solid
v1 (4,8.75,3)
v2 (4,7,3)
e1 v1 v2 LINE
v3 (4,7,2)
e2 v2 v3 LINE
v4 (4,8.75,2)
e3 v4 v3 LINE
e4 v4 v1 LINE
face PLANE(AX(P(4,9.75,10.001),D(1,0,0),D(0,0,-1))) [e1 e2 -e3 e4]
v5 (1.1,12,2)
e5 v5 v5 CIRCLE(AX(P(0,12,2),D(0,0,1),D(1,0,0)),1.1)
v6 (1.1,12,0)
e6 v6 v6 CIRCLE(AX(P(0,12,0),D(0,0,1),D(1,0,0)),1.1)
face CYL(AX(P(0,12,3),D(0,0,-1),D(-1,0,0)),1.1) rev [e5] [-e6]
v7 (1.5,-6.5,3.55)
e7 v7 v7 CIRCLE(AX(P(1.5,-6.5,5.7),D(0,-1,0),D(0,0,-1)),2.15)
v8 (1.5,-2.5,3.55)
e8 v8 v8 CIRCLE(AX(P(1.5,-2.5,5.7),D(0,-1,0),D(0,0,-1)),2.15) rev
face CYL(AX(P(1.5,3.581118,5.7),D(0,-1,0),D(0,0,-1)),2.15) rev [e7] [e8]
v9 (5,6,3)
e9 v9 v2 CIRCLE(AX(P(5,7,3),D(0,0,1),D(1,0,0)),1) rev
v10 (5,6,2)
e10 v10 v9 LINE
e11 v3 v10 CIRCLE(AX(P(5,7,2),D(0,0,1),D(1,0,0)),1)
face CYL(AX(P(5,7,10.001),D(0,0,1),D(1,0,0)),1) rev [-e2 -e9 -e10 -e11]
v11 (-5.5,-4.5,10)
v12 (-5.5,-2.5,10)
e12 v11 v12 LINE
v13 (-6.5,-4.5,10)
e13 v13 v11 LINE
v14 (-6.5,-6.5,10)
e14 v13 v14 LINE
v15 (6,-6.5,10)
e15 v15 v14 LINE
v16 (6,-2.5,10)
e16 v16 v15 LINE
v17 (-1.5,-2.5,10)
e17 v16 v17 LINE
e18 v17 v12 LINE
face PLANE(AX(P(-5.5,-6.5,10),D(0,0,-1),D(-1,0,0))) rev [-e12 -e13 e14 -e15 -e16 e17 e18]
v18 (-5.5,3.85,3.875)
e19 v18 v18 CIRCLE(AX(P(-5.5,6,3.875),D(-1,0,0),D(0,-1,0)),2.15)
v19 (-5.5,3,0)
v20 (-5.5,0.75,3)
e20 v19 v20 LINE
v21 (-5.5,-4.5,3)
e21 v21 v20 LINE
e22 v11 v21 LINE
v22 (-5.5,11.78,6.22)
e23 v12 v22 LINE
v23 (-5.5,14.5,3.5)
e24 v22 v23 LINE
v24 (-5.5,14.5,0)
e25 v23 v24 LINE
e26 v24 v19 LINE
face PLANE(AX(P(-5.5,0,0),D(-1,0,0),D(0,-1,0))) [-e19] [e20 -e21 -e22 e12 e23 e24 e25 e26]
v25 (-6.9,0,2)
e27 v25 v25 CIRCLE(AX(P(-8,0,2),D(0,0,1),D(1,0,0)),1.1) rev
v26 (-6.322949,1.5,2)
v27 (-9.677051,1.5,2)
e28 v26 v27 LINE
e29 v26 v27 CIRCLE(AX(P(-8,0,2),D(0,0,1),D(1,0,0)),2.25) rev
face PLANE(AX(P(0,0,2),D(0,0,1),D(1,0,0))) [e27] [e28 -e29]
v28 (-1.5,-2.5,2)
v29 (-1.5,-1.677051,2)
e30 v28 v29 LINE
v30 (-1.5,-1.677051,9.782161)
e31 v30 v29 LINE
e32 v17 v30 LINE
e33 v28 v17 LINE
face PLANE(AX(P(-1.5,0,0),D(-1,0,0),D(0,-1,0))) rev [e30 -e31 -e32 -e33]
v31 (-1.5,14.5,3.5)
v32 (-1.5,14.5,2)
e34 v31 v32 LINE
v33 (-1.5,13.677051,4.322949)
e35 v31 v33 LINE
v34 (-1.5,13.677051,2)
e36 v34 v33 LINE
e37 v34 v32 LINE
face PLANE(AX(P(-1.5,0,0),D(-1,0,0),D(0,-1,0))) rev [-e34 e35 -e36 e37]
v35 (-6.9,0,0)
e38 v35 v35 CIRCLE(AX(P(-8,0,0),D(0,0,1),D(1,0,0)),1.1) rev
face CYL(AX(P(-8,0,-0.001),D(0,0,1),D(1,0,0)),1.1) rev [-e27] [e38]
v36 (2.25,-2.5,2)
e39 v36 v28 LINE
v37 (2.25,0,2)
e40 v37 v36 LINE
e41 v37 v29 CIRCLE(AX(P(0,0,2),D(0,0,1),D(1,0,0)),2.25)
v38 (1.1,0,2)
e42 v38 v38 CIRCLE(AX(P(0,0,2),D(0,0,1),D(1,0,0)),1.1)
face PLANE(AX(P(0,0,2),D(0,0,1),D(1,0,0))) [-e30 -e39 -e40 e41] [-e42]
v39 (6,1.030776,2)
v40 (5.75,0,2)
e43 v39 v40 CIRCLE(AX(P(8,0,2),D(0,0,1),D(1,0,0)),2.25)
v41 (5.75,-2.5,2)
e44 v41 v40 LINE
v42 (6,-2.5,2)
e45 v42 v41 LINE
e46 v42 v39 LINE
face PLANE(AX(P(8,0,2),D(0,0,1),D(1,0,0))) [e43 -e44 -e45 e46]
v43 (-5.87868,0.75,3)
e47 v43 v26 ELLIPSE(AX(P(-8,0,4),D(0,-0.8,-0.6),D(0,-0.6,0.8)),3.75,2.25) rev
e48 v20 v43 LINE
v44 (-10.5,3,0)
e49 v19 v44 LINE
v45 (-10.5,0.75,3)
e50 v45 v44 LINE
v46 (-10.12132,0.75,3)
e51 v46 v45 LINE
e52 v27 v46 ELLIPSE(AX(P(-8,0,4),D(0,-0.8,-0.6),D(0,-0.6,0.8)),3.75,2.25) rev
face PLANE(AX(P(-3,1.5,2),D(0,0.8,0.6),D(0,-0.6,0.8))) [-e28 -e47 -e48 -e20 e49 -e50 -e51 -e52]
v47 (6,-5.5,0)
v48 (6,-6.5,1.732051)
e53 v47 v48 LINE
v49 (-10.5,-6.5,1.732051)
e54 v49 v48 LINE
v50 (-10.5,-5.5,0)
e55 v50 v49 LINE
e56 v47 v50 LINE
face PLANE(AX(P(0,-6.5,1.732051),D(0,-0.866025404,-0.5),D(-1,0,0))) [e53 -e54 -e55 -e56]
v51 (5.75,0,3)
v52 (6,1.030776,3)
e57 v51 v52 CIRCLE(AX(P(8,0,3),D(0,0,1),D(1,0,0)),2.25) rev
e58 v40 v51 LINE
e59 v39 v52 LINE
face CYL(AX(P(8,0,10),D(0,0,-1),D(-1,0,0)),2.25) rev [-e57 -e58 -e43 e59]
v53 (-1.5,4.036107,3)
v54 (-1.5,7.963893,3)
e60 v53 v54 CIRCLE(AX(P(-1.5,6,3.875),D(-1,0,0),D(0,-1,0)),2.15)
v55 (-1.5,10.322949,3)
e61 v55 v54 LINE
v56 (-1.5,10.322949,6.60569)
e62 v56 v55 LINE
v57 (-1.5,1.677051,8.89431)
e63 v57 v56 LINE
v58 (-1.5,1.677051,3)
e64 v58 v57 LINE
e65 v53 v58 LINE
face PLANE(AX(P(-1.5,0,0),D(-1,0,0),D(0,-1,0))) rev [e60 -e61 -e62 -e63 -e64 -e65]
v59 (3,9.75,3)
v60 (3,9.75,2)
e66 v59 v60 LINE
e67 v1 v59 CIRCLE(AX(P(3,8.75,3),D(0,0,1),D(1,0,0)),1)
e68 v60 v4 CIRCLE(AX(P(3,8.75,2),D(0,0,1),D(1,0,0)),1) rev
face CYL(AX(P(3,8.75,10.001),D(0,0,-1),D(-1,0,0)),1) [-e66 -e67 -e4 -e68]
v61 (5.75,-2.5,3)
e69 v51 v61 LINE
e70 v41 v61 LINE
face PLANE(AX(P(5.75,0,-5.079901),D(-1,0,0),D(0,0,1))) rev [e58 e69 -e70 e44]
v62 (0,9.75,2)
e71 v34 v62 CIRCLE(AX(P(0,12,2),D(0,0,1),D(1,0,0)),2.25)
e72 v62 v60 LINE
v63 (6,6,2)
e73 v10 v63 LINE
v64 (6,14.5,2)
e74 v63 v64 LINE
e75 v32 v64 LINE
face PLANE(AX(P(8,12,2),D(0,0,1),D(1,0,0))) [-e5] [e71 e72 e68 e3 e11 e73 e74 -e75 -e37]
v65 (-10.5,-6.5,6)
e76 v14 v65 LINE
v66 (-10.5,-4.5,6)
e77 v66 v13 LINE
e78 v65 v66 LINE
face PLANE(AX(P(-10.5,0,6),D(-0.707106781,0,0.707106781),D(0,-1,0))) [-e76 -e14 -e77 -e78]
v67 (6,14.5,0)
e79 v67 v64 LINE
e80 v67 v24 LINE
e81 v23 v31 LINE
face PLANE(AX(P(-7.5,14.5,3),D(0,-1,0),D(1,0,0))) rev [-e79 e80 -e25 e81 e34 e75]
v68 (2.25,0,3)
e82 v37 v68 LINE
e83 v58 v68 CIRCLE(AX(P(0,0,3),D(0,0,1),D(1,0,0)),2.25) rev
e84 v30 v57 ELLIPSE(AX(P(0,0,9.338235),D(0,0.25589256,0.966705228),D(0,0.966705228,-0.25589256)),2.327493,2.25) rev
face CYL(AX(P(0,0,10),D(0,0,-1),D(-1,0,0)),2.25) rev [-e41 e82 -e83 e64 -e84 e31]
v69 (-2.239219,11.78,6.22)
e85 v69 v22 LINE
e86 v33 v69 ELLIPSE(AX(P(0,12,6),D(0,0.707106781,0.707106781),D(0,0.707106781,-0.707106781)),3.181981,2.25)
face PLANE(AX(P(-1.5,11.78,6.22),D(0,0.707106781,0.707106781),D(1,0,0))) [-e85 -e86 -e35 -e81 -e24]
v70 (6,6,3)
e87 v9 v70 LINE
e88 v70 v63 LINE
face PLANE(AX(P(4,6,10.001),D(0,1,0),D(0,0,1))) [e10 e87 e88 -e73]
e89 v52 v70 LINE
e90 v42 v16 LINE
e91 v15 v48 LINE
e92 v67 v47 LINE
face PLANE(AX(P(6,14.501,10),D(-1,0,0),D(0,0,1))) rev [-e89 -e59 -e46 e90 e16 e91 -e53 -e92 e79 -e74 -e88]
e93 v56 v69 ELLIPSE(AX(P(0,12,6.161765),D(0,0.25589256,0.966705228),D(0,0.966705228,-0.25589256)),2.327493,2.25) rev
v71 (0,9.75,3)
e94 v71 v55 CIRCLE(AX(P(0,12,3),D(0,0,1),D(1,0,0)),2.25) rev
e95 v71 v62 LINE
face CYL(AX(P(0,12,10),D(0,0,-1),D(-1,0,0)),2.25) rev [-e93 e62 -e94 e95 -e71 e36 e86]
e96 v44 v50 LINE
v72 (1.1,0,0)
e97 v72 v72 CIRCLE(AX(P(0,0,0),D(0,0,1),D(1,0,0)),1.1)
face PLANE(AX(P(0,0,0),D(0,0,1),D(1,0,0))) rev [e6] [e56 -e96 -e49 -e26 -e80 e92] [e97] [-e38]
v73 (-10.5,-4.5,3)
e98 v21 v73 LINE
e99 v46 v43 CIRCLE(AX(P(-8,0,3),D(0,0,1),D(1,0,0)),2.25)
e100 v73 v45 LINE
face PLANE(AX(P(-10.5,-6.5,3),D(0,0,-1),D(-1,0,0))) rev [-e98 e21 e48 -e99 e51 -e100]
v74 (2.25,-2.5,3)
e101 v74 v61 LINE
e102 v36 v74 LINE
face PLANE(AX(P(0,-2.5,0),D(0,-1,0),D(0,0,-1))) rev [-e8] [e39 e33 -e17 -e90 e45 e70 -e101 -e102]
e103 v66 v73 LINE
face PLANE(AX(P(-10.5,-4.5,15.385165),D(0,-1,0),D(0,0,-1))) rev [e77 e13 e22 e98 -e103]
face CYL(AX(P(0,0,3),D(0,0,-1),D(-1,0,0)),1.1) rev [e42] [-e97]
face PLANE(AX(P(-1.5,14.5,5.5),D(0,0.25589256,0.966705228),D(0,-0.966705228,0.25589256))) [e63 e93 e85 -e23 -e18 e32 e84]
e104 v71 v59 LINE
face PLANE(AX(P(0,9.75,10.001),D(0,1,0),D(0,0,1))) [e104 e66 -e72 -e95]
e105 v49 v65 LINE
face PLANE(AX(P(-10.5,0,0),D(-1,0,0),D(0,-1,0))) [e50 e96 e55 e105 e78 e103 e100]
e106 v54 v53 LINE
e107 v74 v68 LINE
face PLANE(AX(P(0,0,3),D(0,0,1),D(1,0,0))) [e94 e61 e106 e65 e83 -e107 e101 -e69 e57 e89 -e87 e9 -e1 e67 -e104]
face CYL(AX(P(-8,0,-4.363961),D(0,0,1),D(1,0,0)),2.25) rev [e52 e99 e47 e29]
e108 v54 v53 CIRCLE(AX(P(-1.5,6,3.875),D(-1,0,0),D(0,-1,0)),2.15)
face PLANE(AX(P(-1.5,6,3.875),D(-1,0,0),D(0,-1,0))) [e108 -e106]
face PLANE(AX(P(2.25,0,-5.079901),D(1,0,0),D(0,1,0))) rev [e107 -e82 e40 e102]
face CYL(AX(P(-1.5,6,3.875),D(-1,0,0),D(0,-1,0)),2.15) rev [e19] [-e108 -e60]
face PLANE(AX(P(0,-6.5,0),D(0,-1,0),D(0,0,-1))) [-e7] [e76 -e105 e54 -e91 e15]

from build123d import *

# Parameters (mm, degrees)
SKETCH_1_W               = 23
SKETCH_1_H               = 17
SKETCH_1_R               = 1.1
EXTRUDE_1_DEPTH          = 3
EXTRUDE_2_DEPTH          = 6
CUT_EXTRUDE_1_DEPTH      = 23.349496639
CUT_EXTRUDE_1_DEPTH_BACK = 1
SKETCH_3_R               = 2.25
CUT_EXTRUDE_2_REACH      = 24.349
SKETCH_4_W               = 4.5
SKETCH_4_H               = 17
CUT_EXTRUDE_3_DEPTH      = 2
SKETCH_6_R               = 2.15
CUT_EXTRUDE_4_DEPTH      = 4
SKETCH_7_W               = 16.5
SKETCH_7_H               = 10
EXTRUDE_3_DEPTH          = 4
SKETCH_8_R               = 2.15
CUT_EXTRUDE_5_DEPTH      = 4
CHAMFER_1_SIZE           = 1
CHAMFER_1_SIZE2          = 1.732050808
CHAMFER_2_SIZE           = 4
CUT_EXTRUDE_6_DEPTH      = 1
FILLET_1_R               = 2
CUT_EXTRUDE_7_REACH      = 21.881
FILLET_2_R               = 1
CHAMFER_3_SIZE           = 2
CHAMFER_3_SIZE2          = 2.813680863
CUT_EXTRUDE_8_REACH      = 27.729
SKETCH_11_W              = 5
SKETCH_11_H              = 10
EXTRUDE_4_DEPTH          = 5
CUT_EXTRUDE_9_REACH      = 21.222
SKETCH_13_R              = 1.1
SKETCH_14_R              = 2.25
CUT_EXTRUDE_10_DEPTH     = 1
EXTRUDE_6_REACH          = 26.135
FILLET_3_R               = 2
SKETCH_15_W              = 5
SKETCH_15_H              = 2
EXTRUDE_5_DEPTH          = 7
CUT_EXTRUDE_11_DEPTH     = 5
CHAMFER_4_SIZE           = 4


with BuildPart() as part:
    # 草图1 → 凸台-拉伸1 (new body)
    with BuildSketch(Plane.XY):
        with Locations((4, 6)):
            Rectangle(SKETCH_1_W, SKETCH_1_H)
        Circle(SKETCH_1_R, mode=Mode.SUBTRACT)
        with Locations((8, 0)):
            Circle(SKETCH_1_R, mode=Mode.SUBTRACT)
        with Locations((0, 12)):
            Circle(SKETCH_1_R, mode=Mode.SUBTRACT)
        with Locations((8, 12)):
            Circle(SKETCH_1_R, mode=Mode.SUBTRACT)
    extrude(amount=EXTRUDE_1_DEPTH)

    # 草图2 → 凸台-拉伸2 (add)
    with BuildSketch(Plane.ZY.offset(7.5)):
        Polygon((5.5, 14.5), (10, -2.5), (5.5, -2.5), (0, -2.5), (0, 14.5), align=None)
    extrude(amount=-EXTRUDE_2_DEPTH)

    # 草图3 → 切除-拉伸1 (cut, two sides: drawn at the far end of the back side and taken through both)
    with BuildSketch(Plane.XY.offset(3).offset(-CUT_EXTRUDE_1_DEPTH_BACK)):
        with Locations(Location((0, 12, 0), (0, 0, 228.189685104))):
            Circle(SKETCH_3_R)
        with Locations((8, 12)):
            Circle(SKETCH_3_R)
        with Locations(Location((0, 0, 0), (0, 0, 131.810314896))):
            Circle(SKETCH_3_R)
        with Locations((8, 0)):
            Circle(SKETCH_3_R)
    extrude(amount=CUT_EXTRUDE_1_DEPTH + CUT_EXTRUDE_1_DEPTH_BACK, mode=Mode.SUBTRACT)

    # 草图4 → 切除-拉伸2 (cut, up to next)
    with BuildSketch(Plane.XY.offset(3), mode=Mode.PRIVATE) as cut_extrude_2_sk1:
        with Locations((13.25, 6)):
            Rectangle(SKETCH_4_W, SKETCH_4_H)
    cut_extrude_2_tool1 = extrude(cut_extrude_2_sk1.sketch, amount=-CUT_EXTRUDE_2_REACH, mode=Mode.PRIVATE) & part.part
    add(cut_extrude_2_tool1.solids().sort_by_distance((13.25, 6, 3))[0], mode=Mode.SUBTRACT)

    # 草图5 → 切除-拉伸3 (cut)
    with BuildSketch(Plane.ZY.offset(7.5)):
        Polygon((0, 14.5), (0, -2.5), (10, -2.5), (5.5, 14.5), align=None)
    extrude(amount=-CUT_EXTRUDE_3_DEPTH, mode=Mode.SUBTRACT)

    # 草图6 → 切除-拉伸4 (cut)
    with BuildSketch(Plane.ZY.offset(5.5)):
        with Locations(Location((3.875, 6, 0), (0, 0, 270))):
            Circle(SKETCH_6_R)
    extrude(amount=-CUT_EXTRUDE_4_DEPTH, mode=Mode.SUBTRACT)

    # 草图7 → 凸台-拉伸3 (add)
    with BuildSketch(Plane.XZ.offset(2.5)):
        with Locations((2.75, 5)):
            Rectangle(SKETCH_7_W, SKETCH_7_H)
    extrude(amount=EXTRUDE_3_DEPTH)

    # 草图8 → 切除-拉伸5 (cut)
    with BuildSketch(Plane.XZ.offset(6.5)):
        with Locations(Location((1.5, 5.7, 0), (0, 0, 270))):
            Circle(SKETCH_8_R)
    extrude(amount=-CUT_EXTRUDE_5_DEPTH, mode=Mode.SUBTRACT)

    # 倒角1
    chamfer_1_edges = [part.edges().sort_by_distance(p)[0] for p in [
        (2.75, -6.5, 0),
    ]]
    chamfer_1_side = [part.faces().sort_by_distance(p)[0] for p in [
        (2.692629218, 3.908206749, 0),
    ]]
    chamfer(chamfer_1_edges, length=CHAMFER_1_SIZE, length2=CHAMFER_1_SIZE2, reference=chamfer_1_side[0])

    # 倒角2
    chamfer_2_edges = [part.edges().sort_by_distance(p)[0] for p in [
        (11, -4.5, 10),
    ]]
    chamfer(chamfer_2_edges, length=CHAMFER_2_SIZE)

    # 草图9 → 切除-拉伸6 (cut)
    with BuildSketch(Plane.XY.offset(3)):
        with BuildLine():
            Line((-1.5, 13.677050983), (-1.5, 14.5))
            Line((-1.5, 14.5), (2.25, 14.5))
            Line((2.25, 14.5), (2.25, 12))
            ThreePointArc((2.25, 12), (0.918558654, 14.053959591), (-1.5, 13.677050983))
        make_face()
        with BuildLine():
            Line((5.75, 12), (5.75, 14.5))
            Line((5.75, 14.5), (11, 14.5))
            Line((11, 14.5), (11, 9.75))
            Line((11, 9.75), (8, 9.75))
            ThreePointArc((8, 9.75), (9.590990258, 13.590990258), (5.75, 12))
        make_face()
        with BuildLine():
            Line((2.25, 0), (2.25, -2.5))
            Line((2.25, -2.5), (-1.5, -2.5))
            Line((-1.5, -2.5), (-1.5, -1.677050983))
            ThreePointArc((-1.5, -1.677050983), (0.918558654, -2.053959591), (2.25, 0))
        make_face()
        with BuildLine():
            Line((5.75, 0), (5.75, -2.5))
            Line((5.75, -2.5), (11, -2.5))
            Line((11, -2.5), (11, 2.25))
            Line((11, 2.25), (8, 2.25))
            ThreePointArc((8, 2.25), (9.590990258, -1.590990258), (5.75, 0))
        make_face()
    extrude(amount=-CUT_EXTRUDE_6_DEPTH, mode=Mode.SUBTRACT)

    # 圆角1
    fillet_1_edges = [part.edges().sort_by_distance(p)[0] for p in [
        (11, 14.5, 1),
    ]]
    fillet(fillet_1_edges, radius=FILLET_1_R)

    # 草图10 → 切除-拉伸7 (cut, up to next)
    with BuildSketch(Plane.XY.offset(2), mode=Mode.PRIVATE) as cut_extrude_7_sk1:
        with BuildLine():
            Line((4, 14.5), (11, 14.5))
            Line((11, 14.5), (11, 6))
            Line((11, 6), (4, 6))
            Line((4, 6), (4, 9.75))
            Line((4, 9.75), (0, 9.75))
            ThreePointArc((0, 9.75), (1.590990258, 10.409009742), (2.25, 12))
            Line((2.25, 12), (2.25, 14.5))
            Line((2.25, 14.5), (4, 14.5))
        make_face()
    cut_extrude_7_tool1 = extrude(cut_extrude_7_sk1.sketch, amount=CUT_EXTRUDE_7_REACH, mode=Mode.PRIVATE) & part.part
    add(cut_extrude_7_tool1.solids().sort_by_distance((6.881457, 10.476255, 2))[0], mode=Mode.SUBTRACT)

    # 圆角2
    fillet_2_edges = [part.edges().sort_by_distance(p)[0] for p in [
        (4, 9.75, 2.5),
        (4, 6, 2.5),
    ]]
    fillet(fillet_2_edges, radius=FILLET_2_R)

    # 倒角3
    chamfer_3_edges = [part.edges().sort_by_distance(p)[0] for p in [
        (-3.5, 14.5, 5.5),
    ]]
    chamfer_3_side = [part.faces().sort_by_distance(p)[0] for p in [
        (0.040697674, 14.5, 1.895348837),
    ]]
    chamfer(chamfer_3_edges, length=CHAMFER_3_SIZE, length2=CHAMFER_3_SIZE2, reference=chamfer_3_side[0])

    # 草图11 → 切除-拉伸8 (cut, up to next)
    with BuildSketch(Plane.XZ.offset(6.5), mode=Mode.PRIVATE) as cut_extrude_8_sk1:
        with Locations((8.5, 5)):
            Rectangle(SKETCH_11_W, SKETCH_11_H)
    cut_extrude_8_tool1 = extrude(cut_extrude_8_sk1.sketch, amount=-CUT_EXTRUDE_8_REACH, mode=Mode.PRIVATE) & part.part
    add(cut_extrude_8_tool1.solids().sort_by_distance((8.5, -6.5, 5))[0], mode=Mode.SUBTRACT)

    # 草图12 → 凸台-拉伸4 (add)
    with BuildSketch(Plane.ZY.offset(5.5)):
        Polygon((0, -5.5), (1.732050808, -6.5), (3, -6.5), (3, 1.5), (0, 1.5), align=None)
    extrude(amount=EXTRUDE_4_DEPTH)

    # 草图13 → 切除-拉伸9 (cut, up to next)
    with BuildSketch(Plane.XY.offset(3), mode=Mode.PRIVATE) as cut_extrude_9_sk1:
        with Locations((-8, 0)):
            Circle(SKETCH_13_R)
    cut_extrude_9_tool1 = extrude(cut_extrude_9_sk1.sketch, amount=-CUT_EXTRUDE_9_REACH, mode=Mode.PRIVATE) & part.part
    add(cut_extrude_9_tool1.solids().sort_by_distance((-8, 0, 3))[0], mode=Mode.SUBTRACT)

    # 草图14 → 切除-拉伸10 (cut)
    with BuildSketch(Plane.XY.offset(3)):
        with Locations((-8, 0)):
            Circle(SKETCH_14_R)
    extrude(amount=-CUT_EXTRUDE_10_DEPTH, mode=Mode.SUBTRACT)

    # 凸台-拉伸6: up to this face of the body (flat: up to its plane)
    extrude_6_end = Plane(part.part.faces().sort_by_distance((-5.5, 3.356262463, 4.741493194))[0])
    # 草图16 → 凸台-拉伸6 (add, up to the picked face)
    with BuildSketch(Plane.ZY.offset(10.5), mode=Mode.PRIVATE) as extrude_6_sk1:
        Polygon((2, 1.5), (0, 3), (0, 1.5), align=None)
    extrude_6_tool1 = split(extrude(extrude_6_sk1.sketch, amount=-EXTRUDE_6_REACH, mode=Mode.PRIVATE), bisect_by=extrude_6_end, keep=Keep.BOTH, mode=Mode.PRIVATE)
    add(extrude_6_tool1.solids().sort_by(Axis((-10.5, 2, 0.666667), (1, 0, 0)))[0])

    # 圆角3
    # the kernel refuses this fillet: 2 mm, written as the material it takes off along each edge
    with BuildSketch(Plane(origin=(-10.5, 1.5, 7.042393307), x_dir=(1, 0, 0), z_dir=(0, 0, -1))) as fillet_3_piece_1_section:
        with BuildLine():
            CenterArc((2, 1.616957323), FILLET_3_R, 180, 53.947557716)
            Line((0, 1.616957323), (0, 0))
            Line((0, 0), (0.822949017, 0))
        make_face()
    fillet_3_piece_1 = extrude(amount=9.084786613, mode=Mode.PRIVATE)
    fillet_3_piece_1 = split(fillet_3_piece_1, bisect_by=Plane(origin=(-10.039236146, 1.139870627, 2.480172498), z_dir=(0, 0.8000000000000002, 0.6)), keep=Keep.TOP, mode=Mode.PRIVATE)
    add(fillet_3_piece_1, mode=Mode.SUBTRACT)

    # 草图15 → 凸台-拉伸5 (add)
    with BuildSketch(Plane.XY.offset(3)):
        with Locations((-8, -5.5)):
            Rectangle(SKETCH_15_W, SKETCH_15_H)
    extrude(amount=EXTRUDE_5_DEPTH)

    # 草图17 → 切除-拉伸11 (cut)
    with BuildSketch(Plane.ZY.offset(10.5)):
        Polygon((2, 1.5), (3, 0.75), (3, 1.5), align=None)
    extrude(amount=-CUT_EXTRUDE_11_DEPTH, mode=Mode.SUBTRACT)

    # 倒角4
    chamfer_4_edges = [part.edges().sort_by_distance(p)[0] for p in [
        (-10.5, -5.5, 10),
    ]]
    chamfer(chamfer_4_edges, length=CHAMFER_4_SIZE)


solid = part.part
